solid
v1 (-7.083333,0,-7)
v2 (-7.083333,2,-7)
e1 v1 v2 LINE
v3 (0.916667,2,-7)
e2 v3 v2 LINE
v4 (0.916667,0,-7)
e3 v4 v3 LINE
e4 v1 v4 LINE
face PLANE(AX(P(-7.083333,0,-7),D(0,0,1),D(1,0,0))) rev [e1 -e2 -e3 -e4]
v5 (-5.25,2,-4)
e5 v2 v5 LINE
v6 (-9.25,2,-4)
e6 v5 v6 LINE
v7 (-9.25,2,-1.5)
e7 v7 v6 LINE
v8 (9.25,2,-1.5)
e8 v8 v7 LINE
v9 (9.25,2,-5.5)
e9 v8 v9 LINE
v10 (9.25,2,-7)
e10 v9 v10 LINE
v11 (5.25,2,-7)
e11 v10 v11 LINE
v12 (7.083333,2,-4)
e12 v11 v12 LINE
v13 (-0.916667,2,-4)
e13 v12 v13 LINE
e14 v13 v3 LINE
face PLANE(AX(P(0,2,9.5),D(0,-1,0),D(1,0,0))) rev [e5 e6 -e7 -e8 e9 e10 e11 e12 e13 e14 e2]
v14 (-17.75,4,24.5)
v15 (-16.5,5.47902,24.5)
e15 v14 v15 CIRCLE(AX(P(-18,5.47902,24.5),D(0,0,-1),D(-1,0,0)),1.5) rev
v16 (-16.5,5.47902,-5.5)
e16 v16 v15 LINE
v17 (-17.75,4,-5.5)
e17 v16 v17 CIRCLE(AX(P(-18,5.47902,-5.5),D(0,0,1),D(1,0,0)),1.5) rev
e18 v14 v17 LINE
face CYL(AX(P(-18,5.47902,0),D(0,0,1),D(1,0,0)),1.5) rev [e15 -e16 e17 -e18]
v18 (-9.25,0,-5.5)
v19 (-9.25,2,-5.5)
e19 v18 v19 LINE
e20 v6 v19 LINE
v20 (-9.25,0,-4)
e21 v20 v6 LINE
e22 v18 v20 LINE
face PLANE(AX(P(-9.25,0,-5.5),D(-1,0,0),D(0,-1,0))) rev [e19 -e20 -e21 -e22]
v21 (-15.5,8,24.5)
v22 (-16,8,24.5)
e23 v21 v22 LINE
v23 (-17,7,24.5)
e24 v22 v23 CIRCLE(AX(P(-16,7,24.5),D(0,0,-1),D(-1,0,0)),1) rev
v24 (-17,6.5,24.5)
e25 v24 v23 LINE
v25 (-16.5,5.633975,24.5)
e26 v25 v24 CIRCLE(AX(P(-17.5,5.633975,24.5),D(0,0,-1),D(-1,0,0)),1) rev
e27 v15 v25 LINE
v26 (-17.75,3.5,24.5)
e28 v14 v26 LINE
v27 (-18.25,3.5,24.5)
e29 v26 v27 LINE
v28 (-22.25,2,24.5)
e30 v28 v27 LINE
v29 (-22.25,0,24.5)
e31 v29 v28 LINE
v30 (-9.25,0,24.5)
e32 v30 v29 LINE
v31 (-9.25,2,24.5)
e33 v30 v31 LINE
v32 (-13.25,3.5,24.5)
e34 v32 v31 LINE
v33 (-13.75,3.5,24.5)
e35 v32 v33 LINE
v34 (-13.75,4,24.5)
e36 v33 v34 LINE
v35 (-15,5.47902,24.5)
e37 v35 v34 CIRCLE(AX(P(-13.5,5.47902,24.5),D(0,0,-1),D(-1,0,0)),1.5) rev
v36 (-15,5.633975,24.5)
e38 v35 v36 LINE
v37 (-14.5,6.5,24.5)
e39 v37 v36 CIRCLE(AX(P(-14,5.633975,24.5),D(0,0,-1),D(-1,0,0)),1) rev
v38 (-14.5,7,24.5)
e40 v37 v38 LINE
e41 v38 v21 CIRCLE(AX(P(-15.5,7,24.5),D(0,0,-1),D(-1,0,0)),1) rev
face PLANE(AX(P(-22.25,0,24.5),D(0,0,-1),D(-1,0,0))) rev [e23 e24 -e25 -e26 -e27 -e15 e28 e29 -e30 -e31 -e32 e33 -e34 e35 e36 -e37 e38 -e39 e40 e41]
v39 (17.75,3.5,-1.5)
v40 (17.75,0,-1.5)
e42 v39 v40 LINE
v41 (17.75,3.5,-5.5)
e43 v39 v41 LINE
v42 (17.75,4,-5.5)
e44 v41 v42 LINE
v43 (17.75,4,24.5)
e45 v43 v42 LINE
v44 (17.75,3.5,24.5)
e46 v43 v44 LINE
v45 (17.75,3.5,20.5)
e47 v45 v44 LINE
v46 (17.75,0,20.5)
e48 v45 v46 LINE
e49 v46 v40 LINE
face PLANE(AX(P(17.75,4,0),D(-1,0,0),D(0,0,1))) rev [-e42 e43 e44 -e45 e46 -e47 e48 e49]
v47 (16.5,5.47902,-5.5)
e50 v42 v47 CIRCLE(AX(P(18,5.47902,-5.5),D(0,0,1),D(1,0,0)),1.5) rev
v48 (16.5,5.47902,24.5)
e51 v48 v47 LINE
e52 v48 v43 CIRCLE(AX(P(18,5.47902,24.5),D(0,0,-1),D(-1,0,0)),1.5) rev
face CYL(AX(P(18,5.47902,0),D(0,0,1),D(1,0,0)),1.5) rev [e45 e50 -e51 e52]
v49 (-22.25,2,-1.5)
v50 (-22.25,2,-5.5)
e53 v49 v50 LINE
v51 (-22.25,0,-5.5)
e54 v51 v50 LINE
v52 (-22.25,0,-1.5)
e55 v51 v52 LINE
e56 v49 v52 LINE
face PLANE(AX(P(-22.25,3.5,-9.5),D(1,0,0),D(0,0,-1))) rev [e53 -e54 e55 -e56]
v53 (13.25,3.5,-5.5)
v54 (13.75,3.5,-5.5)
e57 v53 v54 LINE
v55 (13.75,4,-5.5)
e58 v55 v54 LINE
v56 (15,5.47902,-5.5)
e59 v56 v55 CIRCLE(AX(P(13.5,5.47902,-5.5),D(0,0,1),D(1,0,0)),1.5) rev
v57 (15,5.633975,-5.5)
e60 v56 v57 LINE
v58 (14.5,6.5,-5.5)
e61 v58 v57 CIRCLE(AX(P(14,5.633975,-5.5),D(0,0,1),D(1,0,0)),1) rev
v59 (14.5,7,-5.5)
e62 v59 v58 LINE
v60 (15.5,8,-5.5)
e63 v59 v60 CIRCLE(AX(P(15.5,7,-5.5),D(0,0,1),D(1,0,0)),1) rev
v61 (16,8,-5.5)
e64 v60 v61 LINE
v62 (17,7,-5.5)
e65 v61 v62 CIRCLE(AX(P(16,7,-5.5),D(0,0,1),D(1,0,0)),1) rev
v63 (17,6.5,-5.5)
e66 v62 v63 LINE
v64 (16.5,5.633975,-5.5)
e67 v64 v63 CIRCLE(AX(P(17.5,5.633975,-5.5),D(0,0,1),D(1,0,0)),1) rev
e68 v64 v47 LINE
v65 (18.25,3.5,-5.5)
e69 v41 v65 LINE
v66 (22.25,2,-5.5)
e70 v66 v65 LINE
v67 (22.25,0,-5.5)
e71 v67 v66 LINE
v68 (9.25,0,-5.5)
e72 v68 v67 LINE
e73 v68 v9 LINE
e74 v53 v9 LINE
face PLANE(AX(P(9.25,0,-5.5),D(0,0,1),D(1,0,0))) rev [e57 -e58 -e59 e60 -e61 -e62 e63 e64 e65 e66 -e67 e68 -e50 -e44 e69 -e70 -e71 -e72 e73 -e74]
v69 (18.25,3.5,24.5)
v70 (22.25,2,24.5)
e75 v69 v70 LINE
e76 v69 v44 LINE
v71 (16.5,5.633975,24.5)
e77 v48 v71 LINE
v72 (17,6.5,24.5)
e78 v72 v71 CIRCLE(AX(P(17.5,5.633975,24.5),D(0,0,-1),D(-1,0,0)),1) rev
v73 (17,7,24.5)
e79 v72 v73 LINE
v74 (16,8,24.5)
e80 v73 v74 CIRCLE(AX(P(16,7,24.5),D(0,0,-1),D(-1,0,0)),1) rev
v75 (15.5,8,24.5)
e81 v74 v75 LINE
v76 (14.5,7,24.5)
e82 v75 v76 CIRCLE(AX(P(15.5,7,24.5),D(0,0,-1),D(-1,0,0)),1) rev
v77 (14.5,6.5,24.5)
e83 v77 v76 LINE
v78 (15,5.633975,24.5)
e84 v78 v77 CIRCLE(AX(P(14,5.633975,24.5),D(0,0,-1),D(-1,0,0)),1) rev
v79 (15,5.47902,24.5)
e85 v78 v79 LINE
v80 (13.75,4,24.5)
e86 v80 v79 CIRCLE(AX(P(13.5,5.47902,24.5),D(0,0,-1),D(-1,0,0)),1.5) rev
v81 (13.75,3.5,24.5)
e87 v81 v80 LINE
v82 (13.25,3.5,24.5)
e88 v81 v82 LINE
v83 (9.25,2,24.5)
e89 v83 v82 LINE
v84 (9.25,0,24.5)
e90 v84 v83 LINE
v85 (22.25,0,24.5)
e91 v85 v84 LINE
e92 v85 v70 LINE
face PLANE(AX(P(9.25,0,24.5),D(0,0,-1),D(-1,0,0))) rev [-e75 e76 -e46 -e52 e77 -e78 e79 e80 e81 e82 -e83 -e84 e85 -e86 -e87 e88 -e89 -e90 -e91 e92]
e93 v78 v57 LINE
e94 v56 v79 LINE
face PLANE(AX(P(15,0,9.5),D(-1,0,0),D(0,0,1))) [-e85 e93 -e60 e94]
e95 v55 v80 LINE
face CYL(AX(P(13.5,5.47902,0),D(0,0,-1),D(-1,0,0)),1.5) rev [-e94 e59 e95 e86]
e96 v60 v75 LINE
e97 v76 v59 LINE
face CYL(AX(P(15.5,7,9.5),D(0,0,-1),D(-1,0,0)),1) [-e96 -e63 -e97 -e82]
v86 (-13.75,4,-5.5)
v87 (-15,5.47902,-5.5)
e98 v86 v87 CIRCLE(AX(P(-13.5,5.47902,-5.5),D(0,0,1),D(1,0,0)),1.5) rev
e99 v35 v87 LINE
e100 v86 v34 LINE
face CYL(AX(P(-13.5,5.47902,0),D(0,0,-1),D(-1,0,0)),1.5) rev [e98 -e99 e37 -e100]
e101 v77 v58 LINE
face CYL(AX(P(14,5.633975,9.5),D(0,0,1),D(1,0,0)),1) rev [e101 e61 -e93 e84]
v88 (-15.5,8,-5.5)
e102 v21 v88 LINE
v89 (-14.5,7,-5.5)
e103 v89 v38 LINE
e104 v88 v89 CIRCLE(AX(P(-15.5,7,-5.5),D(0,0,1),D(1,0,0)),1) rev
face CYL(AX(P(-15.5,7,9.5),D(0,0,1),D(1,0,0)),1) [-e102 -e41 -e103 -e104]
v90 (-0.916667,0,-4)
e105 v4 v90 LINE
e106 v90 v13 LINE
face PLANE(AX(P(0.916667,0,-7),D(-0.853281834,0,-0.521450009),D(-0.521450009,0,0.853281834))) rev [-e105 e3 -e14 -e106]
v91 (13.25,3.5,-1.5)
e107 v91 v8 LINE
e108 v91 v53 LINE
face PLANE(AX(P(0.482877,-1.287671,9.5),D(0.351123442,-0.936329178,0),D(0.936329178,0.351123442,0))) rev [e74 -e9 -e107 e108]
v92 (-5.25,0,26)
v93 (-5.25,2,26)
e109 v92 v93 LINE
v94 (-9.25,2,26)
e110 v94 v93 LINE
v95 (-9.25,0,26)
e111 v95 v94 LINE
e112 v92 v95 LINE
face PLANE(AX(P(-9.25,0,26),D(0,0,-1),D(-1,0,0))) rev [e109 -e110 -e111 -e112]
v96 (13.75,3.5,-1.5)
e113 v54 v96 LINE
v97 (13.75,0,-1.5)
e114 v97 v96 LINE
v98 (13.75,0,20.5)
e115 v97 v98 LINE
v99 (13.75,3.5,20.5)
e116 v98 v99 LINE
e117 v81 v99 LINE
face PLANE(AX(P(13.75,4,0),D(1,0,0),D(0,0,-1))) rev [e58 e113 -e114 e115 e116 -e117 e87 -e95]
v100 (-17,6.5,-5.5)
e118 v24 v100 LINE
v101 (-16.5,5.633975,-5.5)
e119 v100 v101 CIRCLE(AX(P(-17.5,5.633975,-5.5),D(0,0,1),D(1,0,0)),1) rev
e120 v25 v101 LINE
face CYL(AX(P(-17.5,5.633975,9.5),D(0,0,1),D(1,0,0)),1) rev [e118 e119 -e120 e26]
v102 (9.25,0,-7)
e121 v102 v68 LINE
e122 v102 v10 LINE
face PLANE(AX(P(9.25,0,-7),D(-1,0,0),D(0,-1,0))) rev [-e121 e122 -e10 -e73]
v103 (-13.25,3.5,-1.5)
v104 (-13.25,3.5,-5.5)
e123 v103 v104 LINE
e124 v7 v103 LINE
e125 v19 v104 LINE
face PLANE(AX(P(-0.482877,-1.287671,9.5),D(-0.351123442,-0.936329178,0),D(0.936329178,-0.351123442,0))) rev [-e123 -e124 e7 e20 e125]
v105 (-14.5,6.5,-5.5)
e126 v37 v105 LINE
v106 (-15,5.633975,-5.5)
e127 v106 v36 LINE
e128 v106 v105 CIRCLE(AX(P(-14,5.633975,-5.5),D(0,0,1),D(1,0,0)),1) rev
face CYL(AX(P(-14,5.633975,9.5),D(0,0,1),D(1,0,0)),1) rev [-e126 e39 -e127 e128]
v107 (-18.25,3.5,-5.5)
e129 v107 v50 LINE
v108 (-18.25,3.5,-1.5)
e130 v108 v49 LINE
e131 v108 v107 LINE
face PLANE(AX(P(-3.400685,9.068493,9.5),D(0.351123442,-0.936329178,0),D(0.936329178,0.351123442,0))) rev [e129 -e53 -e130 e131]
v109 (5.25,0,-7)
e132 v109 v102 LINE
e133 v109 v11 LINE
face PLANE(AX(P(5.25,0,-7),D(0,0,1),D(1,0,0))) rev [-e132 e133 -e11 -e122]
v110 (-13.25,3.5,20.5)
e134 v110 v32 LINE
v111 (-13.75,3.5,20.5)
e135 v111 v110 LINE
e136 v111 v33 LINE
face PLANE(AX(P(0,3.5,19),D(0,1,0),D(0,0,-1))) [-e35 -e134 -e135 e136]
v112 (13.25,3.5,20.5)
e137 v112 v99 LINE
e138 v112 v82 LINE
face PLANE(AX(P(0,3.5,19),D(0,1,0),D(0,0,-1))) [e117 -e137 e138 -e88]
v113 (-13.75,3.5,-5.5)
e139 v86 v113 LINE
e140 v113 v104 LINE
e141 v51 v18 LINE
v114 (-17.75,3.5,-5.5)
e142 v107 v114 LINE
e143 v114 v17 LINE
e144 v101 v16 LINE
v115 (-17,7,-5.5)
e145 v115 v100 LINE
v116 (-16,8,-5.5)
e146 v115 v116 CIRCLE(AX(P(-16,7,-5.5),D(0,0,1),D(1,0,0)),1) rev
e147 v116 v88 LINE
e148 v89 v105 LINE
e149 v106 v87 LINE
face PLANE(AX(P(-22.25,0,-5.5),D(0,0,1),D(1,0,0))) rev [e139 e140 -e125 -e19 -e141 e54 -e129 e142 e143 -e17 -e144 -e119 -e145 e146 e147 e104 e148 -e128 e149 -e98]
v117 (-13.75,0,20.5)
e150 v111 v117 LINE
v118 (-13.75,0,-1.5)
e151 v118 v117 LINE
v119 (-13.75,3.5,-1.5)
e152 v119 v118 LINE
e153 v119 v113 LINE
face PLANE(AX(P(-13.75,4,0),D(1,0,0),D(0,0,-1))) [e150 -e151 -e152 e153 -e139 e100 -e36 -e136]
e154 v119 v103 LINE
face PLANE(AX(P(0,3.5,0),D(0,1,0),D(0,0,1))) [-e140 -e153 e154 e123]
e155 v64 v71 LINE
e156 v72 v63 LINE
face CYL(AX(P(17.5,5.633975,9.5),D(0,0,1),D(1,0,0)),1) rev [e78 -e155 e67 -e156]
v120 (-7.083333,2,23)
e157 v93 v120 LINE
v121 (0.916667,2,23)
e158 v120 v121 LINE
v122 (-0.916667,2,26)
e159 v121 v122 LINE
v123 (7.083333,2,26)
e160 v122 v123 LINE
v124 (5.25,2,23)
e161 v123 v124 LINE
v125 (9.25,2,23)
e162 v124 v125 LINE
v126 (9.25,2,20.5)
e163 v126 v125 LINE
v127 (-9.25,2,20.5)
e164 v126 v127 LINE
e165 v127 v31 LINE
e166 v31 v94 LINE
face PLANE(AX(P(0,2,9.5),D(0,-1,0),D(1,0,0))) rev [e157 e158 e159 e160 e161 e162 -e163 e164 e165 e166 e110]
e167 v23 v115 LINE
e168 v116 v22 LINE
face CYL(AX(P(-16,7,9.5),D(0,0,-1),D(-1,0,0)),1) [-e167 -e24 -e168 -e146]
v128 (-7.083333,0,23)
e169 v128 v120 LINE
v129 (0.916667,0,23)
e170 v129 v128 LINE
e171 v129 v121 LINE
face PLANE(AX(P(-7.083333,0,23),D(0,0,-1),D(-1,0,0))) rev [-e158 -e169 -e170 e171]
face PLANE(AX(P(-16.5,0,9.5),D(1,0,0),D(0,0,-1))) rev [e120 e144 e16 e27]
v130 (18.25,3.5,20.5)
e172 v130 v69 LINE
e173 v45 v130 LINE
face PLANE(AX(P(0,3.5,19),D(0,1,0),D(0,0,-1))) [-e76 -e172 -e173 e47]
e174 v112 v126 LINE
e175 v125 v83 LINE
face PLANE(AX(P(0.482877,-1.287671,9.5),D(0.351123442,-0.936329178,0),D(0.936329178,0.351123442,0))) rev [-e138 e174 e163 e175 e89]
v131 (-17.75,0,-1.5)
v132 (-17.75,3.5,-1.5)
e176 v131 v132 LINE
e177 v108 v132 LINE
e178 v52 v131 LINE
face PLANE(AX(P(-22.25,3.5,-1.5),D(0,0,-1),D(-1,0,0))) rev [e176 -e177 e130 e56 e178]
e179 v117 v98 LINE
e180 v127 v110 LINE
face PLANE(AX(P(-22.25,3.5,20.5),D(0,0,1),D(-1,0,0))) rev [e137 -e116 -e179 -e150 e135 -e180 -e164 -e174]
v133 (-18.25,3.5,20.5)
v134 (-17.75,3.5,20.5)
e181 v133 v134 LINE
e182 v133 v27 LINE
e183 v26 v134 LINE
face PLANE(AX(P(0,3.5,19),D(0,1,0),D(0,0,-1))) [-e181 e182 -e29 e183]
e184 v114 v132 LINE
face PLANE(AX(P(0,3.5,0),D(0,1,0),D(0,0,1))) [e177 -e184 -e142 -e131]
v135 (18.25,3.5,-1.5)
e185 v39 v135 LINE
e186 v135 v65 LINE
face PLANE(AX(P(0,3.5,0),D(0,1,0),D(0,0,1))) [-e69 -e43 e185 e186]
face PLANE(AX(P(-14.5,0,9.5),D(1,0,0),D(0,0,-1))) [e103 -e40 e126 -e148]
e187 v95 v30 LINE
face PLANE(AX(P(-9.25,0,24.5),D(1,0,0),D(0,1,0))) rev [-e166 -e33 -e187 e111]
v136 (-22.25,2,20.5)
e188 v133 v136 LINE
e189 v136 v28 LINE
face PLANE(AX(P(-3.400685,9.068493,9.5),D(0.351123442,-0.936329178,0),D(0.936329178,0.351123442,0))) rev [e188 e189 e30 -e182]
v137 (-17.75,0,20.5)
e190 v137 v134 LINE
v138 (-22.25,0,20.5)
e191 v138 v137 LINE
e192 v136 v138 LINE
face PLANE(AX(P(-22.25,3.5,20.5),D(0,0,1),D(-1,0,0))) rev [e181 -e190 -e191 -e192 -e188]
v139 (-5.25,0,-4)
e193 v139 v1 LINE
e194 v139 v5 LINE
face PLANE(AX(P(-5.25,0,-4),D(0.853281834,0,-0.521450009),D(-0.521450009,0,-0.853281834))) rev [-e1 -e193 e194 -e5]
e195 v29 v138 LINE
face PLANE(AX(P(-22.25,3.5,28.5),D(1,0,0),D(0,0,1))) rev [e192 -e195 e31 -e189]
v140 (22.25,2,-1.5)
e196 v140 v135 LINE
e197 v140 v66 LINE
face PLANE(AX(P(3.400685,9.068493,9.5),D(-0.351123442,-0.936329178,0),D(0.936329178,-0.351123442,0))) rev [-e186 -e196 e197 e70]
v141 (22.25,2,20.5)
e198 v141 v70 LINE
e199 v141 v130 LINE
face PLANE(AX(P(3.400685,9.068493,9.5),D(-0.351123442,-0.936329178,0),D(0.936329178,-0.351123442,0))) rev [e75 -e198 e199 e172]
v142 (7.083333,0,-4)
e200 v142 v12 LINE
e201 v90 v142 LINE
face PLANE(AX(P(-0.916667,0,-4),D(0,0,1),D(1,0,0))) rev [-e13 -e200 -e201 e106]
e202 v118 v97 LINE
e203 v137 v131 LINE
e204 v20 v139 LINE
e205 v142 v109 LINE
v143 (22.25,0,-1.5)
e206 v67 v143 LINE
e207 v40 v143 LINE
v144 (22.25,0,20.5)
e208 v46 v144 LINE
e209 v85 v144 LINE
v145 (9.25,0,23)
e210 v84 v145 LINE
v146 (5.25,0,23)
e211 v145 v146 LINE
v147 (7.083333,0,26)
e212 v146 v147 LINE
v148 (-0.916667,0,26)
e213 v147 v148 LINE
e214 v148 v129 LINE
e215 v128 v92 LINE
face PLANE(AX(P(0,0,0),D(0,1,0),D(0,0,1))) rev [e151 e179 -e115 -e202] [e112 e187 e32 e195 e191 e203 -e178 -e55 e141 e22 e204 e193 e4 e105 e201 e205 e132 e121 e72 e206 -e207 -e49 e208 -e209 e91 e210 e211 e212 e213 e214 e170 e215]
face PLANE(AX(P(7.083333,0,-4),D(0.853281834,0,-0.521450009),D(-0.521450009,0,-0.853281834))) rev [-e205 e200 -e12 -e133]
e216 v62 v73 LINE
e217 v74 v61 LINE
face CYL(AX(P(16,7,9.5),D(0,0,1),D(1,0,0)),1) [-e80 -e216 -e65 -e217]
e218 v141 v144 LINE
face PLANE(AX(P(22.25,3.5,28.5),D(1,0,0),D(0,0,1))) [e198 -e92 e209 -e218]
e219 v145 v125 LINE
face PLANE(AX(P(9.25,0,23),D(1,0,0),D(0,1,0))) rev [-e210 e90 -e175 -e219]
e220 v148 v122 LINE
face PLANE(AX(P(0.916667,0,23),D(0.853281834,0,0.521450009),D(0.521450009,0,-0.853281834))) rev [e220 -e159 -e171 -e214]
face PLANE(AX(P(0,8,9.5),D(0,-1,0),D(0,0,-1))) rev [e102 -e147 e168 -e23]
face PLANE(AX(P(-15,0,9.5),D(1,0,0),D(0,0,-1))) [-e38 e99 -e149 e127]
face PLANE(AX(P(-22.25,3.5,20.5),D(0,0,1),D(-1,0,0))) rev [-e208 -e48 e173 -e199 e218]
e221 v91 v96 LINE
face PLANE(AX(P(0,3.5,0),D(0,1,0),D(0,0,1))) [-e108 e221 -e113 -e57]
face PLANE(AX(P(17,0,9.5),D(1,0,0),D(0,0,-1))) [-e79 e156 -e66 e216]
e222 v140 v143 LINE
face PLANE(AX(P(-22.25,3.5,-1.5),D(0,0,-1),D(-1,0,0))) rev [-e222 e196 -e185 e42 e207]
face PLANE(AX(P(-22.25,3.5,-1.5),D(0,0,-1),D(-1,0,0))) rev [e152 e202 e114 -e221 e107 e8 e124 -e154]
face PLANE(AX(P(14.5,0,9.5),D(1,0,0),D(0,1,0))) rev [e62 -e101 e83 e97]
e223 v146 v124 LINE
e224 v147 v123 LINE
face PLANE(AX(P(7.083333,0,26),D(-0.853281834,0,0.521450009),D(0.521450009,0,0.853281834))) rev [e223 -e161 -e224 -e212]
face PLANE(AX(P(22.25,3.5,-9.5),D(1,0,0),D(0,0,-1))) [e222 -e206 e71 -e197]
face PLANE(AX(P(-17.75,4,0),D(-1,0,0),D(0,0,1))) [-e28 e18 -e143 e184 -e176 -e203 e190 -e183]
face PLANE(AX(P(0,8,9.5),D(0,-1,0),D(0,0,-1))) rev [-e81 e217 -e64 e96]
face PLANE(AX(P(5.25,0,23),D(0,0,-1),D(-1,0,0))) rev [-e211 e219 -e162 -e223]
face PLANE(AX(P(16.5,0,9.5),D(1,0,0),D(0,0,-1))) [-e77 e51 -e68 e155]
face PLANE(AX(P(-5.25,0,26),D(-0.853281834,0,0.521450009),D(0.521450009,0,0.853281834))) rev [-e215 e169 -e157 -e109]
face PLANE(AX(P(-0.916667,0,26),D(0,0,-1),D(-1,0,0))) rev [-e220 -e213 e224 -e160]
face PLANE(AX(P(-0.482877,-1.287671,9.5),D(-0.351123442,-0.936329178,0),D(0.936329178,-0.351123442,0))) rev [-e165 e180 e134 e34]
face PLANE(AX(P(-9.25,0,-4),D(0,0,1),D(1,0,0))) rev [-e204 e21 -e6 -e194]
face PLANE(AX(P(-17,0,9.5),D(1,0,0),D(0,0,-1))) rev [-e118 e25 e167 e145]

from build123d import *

# Parameters (mm, degrees)
SKETCH_1_W               = 4
SKETCH_1_H               = 11
SKETCH_1_H_2             = 8
EXTRUDE_1_DEPTH          = 4
SKETCH_1_7_W             = 44.5
SKETCH_1_7_H             = 8
EXTRUDE_2_DEPTH          = 3.5
SKETCH_2_W               = 18.5
SKETCH_2_H               = 1.5
CUT_EXTRUDE_1_DEPTH      = 30.53070436
SKETCH_2_3_W             = 2.5
SKETCH_2_3_H             = 1.5
EXTRUDE_4_DEPTH          = 19
FILLET_1_R               = 1
FILLET_2_R               = 1.5
FILLET_3_R               = 1
CUT_EXTRUDE_2_DEPTH      = 37.65122781
CUT_EXTRUDE_2_DEPTH_BACK = 37.65122781


with BuildPart() as part:
    # 草图1 → 凸台-拉伸1 (new body)
    with BuildSketch(Plane(origin=(0, 0, 0), x_dir=(1, 0, 0), z_dir=(0, 1, 0))):
        with Locations((-15.75, -4)):
            Rectangle(SKETCH_1_W, SKETCH_1_H)
        with Locations((15.75, -4)):
            Rectangle(SKETCH_1_W, SKETCH_1_H)
        with Locations((15.75, 5.5)):
            Rectangle(SKETCH_1_W, SKETCH_1_H_2)
        with Locations((-15.75, 5.5)):
            Rectangle(SKETCH_1_W, SKETCH_1_H_2)
    extrude(amount=EXTRUDE_1_DEPTH)

    # 草图1<7> → 凸台-拉伸2 (add)
    with BuildSketch(Plane(origin=(0, 0, 0), x_dir=(1, 0, 0), z_dir=(0, 1, 0))):
        with Locations((0, 5.5)):
            Rectangle(SKETCH_1_7_W, SKETCH_1_7_H)
    extrude(amount=EXTRUDE_2_DEPTH)

    # 草图2 → 切除-拉伸1 (cut, through all)
    with BuildSketch(Plane(origin=(0, 0, -9.5), x_dir=(-1, 0, 0), z_dir=(0, 0, -1))):
        with Locations((0, 2.75)):
            Rectangle(SKETCH_2_W, SKETCH_2_H)
        Polygon((13.25, 3.5), (9.25, 3.5), (9.25, 2), align=None)
        Polygon((-9.25, 3.5), (-13.25, 3.5), (-9.25, 2), align=None)
        Polygon((-22.25, 3.5), (-22.25, 2), (-18.25, 3.5), align=None)
        Polygon((22.25, 3.5), (18.25, 3.5), (22.25, 2), align=None)
    extrude(amount=-CUT_EXTRUDE_1_DEPTH, mode=Mode.SUBTRACT)

    # 草图2<3> → 凸台-拉伸4 (add, through all)
    with BuildSketch(Plane(origin=(0, 0, -9.5), x_dir=(-1, 0, 0), z_dir=(0, 0, -1))):
        with Locations((-15.75, 7.25)):
            Rectangle(SKETCH_2_3_W, SKETCH_2_3_H)
        Polygon((-15, 6.5), (-16.5, 6.5), (-16.5, 4), (-15.75, 4), (-15, 4), align=None)
        with Locations((15.75, 7.25)):
            Rectangle(SKETCH_2_3_W, SKETCH_2_3_H)
        Polygon((16.5, 6.5), (15, 6.5), (15, 4), (15.75, 4), (16.5, 4), align=None)
    extrude(amount=-EXTRUDE_4_DEPTH)

    # 圆角1
    # the kernel refuses this fillet: 1 mm, written as the material it adds along each edge
    with BuildSketch(Plane(origin=(-16.5, 6.5, -9.5), x_dir=(0, -1, 0), z_dir=(0, 0, 1))) as fillet_1_piece_1:
        with BuildLine():
            CenterArc((0.866025404, -1), FILLET_1_R, 90, 60)
            Line((0, -0.5), (-0.017320508, -0.49))
            ThreePointArc((-0.017320508, -0.49), (-0.02, -0.25), (-0.02, 0))
            Line((-0.02, 0), (0, 0.02))
            Line((0, 0.02), (0.866025404, 0.02))
            Line((0.866025404, 0.02), (0.866025404, 0))
        make_face()
    extrude(amount=19)
    with BuildSketch(Plane(origin=(-15, 6.5, -9.5), x_dir=(0, -1, 0), z_dir=(0, 0, 1)), Plane(origin=(16.5, 6.5, -9.5), x_dir=(0, -1, 0), z_dir=(0, 0, 1))) as fillet_1_piece_2:
        with BuildLine():
            CenterArc((0.866025404, 1), FILLET_1_R, 210, 60)
            Line((0, 0.5), (-0.017320508, 0.49))
            ThreePointArc((-0.017320508, 0.49), (-0.02, 0.25), (-0.02, 0))
            Line((-0.02, 0), (0, -0.02))
            Line((0, -0.02), (0.866025404, -0.02))
            Line((0.866025404, -0.02), (0.866025404, 0))
        make_face()
    extrude(amount=19)
    with BuildSketch(Plane(origin=(15, 6.5, -9.5), x_dir=(-1, 0, 0), z_dir=(0, 0, 1))) as fillet_1_piece_3:
        with BuildLine():
            CenterArc((1, 0.866025404), FILLET_1_R, 180, 60)
            Line((0, 0.866025404), (-0.02, 0.866025404))
            Line((-0.02, 0.866025404), (-0.02, 0))
            Line((-0.02, 0), (0, -0.02))
            ThreePointArc((0, -0.02), (0.25, -0.02), (0.49, -0.017320508))
            Line((0.49, -0.017320508), (0.5, 0))
        make_face()
    extrude(amount=19)

    # 圆角2
    # the kernel refuses this fillet: 1.5 mm, written as the material it adds along each edge
    with BuildSketch(Plane(origin=(16.5, 4, -9.5), x_dir=(1, 0, 0), z_dir=(0, 0, 1)), Plane(origin=(-15, 4, -9.5), x_dir=(1, 0, 0), z_dir=(0, 0, 1))) as fillet_2_piece_1:
        with BuildLine():
            CenterArc((1.5, 1.479019946), FILLET_2_R, 180, 80.405931773)
            Line((0, 1.479019946), (-0.03, 1.479019946))
            Line((-0.03, 1.479019946), (-0.03, 0))
            Line((-0.03, 0), (0, -0.03))
            ThreePointArc((0, -0.03), (0.625, -0.03), (1.245, -0.029580399))
            Line((1.245, -0.029580399), (1.25, 0))
        make_face()
    extrude(amount=19)
    with BuildSketch(Plane(origin=(15, 4, -9.5), x_dir=(0, 1, 0), z_dir=(0, 0, 1)), Plane(origin=(-16.5, 4, -9.5), x_dir=(0, 1, 0), z_dir=(0, 0, 1))) as fillet_2_piece_2:
        with BuildLine():
            CenterArc((1.479019946, 1.5), FILLET_2_R, 189.594068227, 80.405931773)
            Line((0, 1.25), (-0.029580399, 1.245))
            ThreePointArc((-0.029580399, 1.245), (-0.03, 0.625), (-0.03, 0))
            Line((-0.03, 0), (0, -0.03))
            Line((0, -0.03), (1.479019946, -0.03))
            Line((1.479019946, -0.03), (1.479019946, 0))
        make_face()
    extrude(amount=19)

    # 圆角3
    fillet_3_edges = [part.edges().sort_by_distance(p)[0] for p in [
        (14.5, 8, 0),
        (17, 8, 0),
        (-17, 8, 0),
        (-14.5, 8, 0),
    ]]
    fillet(fillet_3_edges, radius=FILLET_3_R)

    # 镜向2: part across plane


with BuildPart() as part_1:
    add(part.part)
    add(part.part.mirror(Plane(origin=(0, 4, 9.5), x_dir=(1, 0, 0), z_dir=(0, 0, -1))))

    # 草图9 → 切除-拉伸2 (cut, two sides: drawn at the far end of the back side and taken through both)
    with BuildSketch(Plane(origin=(0, 2, 0), x_dir=(1, 0, 0), z_dir=(0, 1, 0)).offset(-CUT_EXTRUDE_2_DEPTH_BACK)):
        Polygon((-22.25, 5.5), (-9.25, 5.5), (-9.25, 4), (-5.25, 4), (-7.083333333, 7), (0.916666667, 7), (-0.916666667, 4), (7.083333333, 4), (5.25, 7), (9.25, 7), (9.25, 5.5), (22.25, 5.5), (22.25, 9.5), (-22.25, 9.5), align=None)
        Polygon((-22.25, -24.5), (-9.25, -24.5), (-9.25, -26), (-5.25, -26), (-7.083333333, -23), (0.916666667, -23), (-0.916666667, -26), (7.083333333, -26), (5.25, -23), (9.25, -23), (9.25, -24.5), (22.25, -24.5), (22.25, -28.5), (-22.25, -28.5), align=None)
    extrude(amount=CUT_EXTRUDE_2_DEPTH + CUT_EXTRUDE_2_DEPTH_BACK, mode=Mode.SUBTRACT)


solid = part_1.part
